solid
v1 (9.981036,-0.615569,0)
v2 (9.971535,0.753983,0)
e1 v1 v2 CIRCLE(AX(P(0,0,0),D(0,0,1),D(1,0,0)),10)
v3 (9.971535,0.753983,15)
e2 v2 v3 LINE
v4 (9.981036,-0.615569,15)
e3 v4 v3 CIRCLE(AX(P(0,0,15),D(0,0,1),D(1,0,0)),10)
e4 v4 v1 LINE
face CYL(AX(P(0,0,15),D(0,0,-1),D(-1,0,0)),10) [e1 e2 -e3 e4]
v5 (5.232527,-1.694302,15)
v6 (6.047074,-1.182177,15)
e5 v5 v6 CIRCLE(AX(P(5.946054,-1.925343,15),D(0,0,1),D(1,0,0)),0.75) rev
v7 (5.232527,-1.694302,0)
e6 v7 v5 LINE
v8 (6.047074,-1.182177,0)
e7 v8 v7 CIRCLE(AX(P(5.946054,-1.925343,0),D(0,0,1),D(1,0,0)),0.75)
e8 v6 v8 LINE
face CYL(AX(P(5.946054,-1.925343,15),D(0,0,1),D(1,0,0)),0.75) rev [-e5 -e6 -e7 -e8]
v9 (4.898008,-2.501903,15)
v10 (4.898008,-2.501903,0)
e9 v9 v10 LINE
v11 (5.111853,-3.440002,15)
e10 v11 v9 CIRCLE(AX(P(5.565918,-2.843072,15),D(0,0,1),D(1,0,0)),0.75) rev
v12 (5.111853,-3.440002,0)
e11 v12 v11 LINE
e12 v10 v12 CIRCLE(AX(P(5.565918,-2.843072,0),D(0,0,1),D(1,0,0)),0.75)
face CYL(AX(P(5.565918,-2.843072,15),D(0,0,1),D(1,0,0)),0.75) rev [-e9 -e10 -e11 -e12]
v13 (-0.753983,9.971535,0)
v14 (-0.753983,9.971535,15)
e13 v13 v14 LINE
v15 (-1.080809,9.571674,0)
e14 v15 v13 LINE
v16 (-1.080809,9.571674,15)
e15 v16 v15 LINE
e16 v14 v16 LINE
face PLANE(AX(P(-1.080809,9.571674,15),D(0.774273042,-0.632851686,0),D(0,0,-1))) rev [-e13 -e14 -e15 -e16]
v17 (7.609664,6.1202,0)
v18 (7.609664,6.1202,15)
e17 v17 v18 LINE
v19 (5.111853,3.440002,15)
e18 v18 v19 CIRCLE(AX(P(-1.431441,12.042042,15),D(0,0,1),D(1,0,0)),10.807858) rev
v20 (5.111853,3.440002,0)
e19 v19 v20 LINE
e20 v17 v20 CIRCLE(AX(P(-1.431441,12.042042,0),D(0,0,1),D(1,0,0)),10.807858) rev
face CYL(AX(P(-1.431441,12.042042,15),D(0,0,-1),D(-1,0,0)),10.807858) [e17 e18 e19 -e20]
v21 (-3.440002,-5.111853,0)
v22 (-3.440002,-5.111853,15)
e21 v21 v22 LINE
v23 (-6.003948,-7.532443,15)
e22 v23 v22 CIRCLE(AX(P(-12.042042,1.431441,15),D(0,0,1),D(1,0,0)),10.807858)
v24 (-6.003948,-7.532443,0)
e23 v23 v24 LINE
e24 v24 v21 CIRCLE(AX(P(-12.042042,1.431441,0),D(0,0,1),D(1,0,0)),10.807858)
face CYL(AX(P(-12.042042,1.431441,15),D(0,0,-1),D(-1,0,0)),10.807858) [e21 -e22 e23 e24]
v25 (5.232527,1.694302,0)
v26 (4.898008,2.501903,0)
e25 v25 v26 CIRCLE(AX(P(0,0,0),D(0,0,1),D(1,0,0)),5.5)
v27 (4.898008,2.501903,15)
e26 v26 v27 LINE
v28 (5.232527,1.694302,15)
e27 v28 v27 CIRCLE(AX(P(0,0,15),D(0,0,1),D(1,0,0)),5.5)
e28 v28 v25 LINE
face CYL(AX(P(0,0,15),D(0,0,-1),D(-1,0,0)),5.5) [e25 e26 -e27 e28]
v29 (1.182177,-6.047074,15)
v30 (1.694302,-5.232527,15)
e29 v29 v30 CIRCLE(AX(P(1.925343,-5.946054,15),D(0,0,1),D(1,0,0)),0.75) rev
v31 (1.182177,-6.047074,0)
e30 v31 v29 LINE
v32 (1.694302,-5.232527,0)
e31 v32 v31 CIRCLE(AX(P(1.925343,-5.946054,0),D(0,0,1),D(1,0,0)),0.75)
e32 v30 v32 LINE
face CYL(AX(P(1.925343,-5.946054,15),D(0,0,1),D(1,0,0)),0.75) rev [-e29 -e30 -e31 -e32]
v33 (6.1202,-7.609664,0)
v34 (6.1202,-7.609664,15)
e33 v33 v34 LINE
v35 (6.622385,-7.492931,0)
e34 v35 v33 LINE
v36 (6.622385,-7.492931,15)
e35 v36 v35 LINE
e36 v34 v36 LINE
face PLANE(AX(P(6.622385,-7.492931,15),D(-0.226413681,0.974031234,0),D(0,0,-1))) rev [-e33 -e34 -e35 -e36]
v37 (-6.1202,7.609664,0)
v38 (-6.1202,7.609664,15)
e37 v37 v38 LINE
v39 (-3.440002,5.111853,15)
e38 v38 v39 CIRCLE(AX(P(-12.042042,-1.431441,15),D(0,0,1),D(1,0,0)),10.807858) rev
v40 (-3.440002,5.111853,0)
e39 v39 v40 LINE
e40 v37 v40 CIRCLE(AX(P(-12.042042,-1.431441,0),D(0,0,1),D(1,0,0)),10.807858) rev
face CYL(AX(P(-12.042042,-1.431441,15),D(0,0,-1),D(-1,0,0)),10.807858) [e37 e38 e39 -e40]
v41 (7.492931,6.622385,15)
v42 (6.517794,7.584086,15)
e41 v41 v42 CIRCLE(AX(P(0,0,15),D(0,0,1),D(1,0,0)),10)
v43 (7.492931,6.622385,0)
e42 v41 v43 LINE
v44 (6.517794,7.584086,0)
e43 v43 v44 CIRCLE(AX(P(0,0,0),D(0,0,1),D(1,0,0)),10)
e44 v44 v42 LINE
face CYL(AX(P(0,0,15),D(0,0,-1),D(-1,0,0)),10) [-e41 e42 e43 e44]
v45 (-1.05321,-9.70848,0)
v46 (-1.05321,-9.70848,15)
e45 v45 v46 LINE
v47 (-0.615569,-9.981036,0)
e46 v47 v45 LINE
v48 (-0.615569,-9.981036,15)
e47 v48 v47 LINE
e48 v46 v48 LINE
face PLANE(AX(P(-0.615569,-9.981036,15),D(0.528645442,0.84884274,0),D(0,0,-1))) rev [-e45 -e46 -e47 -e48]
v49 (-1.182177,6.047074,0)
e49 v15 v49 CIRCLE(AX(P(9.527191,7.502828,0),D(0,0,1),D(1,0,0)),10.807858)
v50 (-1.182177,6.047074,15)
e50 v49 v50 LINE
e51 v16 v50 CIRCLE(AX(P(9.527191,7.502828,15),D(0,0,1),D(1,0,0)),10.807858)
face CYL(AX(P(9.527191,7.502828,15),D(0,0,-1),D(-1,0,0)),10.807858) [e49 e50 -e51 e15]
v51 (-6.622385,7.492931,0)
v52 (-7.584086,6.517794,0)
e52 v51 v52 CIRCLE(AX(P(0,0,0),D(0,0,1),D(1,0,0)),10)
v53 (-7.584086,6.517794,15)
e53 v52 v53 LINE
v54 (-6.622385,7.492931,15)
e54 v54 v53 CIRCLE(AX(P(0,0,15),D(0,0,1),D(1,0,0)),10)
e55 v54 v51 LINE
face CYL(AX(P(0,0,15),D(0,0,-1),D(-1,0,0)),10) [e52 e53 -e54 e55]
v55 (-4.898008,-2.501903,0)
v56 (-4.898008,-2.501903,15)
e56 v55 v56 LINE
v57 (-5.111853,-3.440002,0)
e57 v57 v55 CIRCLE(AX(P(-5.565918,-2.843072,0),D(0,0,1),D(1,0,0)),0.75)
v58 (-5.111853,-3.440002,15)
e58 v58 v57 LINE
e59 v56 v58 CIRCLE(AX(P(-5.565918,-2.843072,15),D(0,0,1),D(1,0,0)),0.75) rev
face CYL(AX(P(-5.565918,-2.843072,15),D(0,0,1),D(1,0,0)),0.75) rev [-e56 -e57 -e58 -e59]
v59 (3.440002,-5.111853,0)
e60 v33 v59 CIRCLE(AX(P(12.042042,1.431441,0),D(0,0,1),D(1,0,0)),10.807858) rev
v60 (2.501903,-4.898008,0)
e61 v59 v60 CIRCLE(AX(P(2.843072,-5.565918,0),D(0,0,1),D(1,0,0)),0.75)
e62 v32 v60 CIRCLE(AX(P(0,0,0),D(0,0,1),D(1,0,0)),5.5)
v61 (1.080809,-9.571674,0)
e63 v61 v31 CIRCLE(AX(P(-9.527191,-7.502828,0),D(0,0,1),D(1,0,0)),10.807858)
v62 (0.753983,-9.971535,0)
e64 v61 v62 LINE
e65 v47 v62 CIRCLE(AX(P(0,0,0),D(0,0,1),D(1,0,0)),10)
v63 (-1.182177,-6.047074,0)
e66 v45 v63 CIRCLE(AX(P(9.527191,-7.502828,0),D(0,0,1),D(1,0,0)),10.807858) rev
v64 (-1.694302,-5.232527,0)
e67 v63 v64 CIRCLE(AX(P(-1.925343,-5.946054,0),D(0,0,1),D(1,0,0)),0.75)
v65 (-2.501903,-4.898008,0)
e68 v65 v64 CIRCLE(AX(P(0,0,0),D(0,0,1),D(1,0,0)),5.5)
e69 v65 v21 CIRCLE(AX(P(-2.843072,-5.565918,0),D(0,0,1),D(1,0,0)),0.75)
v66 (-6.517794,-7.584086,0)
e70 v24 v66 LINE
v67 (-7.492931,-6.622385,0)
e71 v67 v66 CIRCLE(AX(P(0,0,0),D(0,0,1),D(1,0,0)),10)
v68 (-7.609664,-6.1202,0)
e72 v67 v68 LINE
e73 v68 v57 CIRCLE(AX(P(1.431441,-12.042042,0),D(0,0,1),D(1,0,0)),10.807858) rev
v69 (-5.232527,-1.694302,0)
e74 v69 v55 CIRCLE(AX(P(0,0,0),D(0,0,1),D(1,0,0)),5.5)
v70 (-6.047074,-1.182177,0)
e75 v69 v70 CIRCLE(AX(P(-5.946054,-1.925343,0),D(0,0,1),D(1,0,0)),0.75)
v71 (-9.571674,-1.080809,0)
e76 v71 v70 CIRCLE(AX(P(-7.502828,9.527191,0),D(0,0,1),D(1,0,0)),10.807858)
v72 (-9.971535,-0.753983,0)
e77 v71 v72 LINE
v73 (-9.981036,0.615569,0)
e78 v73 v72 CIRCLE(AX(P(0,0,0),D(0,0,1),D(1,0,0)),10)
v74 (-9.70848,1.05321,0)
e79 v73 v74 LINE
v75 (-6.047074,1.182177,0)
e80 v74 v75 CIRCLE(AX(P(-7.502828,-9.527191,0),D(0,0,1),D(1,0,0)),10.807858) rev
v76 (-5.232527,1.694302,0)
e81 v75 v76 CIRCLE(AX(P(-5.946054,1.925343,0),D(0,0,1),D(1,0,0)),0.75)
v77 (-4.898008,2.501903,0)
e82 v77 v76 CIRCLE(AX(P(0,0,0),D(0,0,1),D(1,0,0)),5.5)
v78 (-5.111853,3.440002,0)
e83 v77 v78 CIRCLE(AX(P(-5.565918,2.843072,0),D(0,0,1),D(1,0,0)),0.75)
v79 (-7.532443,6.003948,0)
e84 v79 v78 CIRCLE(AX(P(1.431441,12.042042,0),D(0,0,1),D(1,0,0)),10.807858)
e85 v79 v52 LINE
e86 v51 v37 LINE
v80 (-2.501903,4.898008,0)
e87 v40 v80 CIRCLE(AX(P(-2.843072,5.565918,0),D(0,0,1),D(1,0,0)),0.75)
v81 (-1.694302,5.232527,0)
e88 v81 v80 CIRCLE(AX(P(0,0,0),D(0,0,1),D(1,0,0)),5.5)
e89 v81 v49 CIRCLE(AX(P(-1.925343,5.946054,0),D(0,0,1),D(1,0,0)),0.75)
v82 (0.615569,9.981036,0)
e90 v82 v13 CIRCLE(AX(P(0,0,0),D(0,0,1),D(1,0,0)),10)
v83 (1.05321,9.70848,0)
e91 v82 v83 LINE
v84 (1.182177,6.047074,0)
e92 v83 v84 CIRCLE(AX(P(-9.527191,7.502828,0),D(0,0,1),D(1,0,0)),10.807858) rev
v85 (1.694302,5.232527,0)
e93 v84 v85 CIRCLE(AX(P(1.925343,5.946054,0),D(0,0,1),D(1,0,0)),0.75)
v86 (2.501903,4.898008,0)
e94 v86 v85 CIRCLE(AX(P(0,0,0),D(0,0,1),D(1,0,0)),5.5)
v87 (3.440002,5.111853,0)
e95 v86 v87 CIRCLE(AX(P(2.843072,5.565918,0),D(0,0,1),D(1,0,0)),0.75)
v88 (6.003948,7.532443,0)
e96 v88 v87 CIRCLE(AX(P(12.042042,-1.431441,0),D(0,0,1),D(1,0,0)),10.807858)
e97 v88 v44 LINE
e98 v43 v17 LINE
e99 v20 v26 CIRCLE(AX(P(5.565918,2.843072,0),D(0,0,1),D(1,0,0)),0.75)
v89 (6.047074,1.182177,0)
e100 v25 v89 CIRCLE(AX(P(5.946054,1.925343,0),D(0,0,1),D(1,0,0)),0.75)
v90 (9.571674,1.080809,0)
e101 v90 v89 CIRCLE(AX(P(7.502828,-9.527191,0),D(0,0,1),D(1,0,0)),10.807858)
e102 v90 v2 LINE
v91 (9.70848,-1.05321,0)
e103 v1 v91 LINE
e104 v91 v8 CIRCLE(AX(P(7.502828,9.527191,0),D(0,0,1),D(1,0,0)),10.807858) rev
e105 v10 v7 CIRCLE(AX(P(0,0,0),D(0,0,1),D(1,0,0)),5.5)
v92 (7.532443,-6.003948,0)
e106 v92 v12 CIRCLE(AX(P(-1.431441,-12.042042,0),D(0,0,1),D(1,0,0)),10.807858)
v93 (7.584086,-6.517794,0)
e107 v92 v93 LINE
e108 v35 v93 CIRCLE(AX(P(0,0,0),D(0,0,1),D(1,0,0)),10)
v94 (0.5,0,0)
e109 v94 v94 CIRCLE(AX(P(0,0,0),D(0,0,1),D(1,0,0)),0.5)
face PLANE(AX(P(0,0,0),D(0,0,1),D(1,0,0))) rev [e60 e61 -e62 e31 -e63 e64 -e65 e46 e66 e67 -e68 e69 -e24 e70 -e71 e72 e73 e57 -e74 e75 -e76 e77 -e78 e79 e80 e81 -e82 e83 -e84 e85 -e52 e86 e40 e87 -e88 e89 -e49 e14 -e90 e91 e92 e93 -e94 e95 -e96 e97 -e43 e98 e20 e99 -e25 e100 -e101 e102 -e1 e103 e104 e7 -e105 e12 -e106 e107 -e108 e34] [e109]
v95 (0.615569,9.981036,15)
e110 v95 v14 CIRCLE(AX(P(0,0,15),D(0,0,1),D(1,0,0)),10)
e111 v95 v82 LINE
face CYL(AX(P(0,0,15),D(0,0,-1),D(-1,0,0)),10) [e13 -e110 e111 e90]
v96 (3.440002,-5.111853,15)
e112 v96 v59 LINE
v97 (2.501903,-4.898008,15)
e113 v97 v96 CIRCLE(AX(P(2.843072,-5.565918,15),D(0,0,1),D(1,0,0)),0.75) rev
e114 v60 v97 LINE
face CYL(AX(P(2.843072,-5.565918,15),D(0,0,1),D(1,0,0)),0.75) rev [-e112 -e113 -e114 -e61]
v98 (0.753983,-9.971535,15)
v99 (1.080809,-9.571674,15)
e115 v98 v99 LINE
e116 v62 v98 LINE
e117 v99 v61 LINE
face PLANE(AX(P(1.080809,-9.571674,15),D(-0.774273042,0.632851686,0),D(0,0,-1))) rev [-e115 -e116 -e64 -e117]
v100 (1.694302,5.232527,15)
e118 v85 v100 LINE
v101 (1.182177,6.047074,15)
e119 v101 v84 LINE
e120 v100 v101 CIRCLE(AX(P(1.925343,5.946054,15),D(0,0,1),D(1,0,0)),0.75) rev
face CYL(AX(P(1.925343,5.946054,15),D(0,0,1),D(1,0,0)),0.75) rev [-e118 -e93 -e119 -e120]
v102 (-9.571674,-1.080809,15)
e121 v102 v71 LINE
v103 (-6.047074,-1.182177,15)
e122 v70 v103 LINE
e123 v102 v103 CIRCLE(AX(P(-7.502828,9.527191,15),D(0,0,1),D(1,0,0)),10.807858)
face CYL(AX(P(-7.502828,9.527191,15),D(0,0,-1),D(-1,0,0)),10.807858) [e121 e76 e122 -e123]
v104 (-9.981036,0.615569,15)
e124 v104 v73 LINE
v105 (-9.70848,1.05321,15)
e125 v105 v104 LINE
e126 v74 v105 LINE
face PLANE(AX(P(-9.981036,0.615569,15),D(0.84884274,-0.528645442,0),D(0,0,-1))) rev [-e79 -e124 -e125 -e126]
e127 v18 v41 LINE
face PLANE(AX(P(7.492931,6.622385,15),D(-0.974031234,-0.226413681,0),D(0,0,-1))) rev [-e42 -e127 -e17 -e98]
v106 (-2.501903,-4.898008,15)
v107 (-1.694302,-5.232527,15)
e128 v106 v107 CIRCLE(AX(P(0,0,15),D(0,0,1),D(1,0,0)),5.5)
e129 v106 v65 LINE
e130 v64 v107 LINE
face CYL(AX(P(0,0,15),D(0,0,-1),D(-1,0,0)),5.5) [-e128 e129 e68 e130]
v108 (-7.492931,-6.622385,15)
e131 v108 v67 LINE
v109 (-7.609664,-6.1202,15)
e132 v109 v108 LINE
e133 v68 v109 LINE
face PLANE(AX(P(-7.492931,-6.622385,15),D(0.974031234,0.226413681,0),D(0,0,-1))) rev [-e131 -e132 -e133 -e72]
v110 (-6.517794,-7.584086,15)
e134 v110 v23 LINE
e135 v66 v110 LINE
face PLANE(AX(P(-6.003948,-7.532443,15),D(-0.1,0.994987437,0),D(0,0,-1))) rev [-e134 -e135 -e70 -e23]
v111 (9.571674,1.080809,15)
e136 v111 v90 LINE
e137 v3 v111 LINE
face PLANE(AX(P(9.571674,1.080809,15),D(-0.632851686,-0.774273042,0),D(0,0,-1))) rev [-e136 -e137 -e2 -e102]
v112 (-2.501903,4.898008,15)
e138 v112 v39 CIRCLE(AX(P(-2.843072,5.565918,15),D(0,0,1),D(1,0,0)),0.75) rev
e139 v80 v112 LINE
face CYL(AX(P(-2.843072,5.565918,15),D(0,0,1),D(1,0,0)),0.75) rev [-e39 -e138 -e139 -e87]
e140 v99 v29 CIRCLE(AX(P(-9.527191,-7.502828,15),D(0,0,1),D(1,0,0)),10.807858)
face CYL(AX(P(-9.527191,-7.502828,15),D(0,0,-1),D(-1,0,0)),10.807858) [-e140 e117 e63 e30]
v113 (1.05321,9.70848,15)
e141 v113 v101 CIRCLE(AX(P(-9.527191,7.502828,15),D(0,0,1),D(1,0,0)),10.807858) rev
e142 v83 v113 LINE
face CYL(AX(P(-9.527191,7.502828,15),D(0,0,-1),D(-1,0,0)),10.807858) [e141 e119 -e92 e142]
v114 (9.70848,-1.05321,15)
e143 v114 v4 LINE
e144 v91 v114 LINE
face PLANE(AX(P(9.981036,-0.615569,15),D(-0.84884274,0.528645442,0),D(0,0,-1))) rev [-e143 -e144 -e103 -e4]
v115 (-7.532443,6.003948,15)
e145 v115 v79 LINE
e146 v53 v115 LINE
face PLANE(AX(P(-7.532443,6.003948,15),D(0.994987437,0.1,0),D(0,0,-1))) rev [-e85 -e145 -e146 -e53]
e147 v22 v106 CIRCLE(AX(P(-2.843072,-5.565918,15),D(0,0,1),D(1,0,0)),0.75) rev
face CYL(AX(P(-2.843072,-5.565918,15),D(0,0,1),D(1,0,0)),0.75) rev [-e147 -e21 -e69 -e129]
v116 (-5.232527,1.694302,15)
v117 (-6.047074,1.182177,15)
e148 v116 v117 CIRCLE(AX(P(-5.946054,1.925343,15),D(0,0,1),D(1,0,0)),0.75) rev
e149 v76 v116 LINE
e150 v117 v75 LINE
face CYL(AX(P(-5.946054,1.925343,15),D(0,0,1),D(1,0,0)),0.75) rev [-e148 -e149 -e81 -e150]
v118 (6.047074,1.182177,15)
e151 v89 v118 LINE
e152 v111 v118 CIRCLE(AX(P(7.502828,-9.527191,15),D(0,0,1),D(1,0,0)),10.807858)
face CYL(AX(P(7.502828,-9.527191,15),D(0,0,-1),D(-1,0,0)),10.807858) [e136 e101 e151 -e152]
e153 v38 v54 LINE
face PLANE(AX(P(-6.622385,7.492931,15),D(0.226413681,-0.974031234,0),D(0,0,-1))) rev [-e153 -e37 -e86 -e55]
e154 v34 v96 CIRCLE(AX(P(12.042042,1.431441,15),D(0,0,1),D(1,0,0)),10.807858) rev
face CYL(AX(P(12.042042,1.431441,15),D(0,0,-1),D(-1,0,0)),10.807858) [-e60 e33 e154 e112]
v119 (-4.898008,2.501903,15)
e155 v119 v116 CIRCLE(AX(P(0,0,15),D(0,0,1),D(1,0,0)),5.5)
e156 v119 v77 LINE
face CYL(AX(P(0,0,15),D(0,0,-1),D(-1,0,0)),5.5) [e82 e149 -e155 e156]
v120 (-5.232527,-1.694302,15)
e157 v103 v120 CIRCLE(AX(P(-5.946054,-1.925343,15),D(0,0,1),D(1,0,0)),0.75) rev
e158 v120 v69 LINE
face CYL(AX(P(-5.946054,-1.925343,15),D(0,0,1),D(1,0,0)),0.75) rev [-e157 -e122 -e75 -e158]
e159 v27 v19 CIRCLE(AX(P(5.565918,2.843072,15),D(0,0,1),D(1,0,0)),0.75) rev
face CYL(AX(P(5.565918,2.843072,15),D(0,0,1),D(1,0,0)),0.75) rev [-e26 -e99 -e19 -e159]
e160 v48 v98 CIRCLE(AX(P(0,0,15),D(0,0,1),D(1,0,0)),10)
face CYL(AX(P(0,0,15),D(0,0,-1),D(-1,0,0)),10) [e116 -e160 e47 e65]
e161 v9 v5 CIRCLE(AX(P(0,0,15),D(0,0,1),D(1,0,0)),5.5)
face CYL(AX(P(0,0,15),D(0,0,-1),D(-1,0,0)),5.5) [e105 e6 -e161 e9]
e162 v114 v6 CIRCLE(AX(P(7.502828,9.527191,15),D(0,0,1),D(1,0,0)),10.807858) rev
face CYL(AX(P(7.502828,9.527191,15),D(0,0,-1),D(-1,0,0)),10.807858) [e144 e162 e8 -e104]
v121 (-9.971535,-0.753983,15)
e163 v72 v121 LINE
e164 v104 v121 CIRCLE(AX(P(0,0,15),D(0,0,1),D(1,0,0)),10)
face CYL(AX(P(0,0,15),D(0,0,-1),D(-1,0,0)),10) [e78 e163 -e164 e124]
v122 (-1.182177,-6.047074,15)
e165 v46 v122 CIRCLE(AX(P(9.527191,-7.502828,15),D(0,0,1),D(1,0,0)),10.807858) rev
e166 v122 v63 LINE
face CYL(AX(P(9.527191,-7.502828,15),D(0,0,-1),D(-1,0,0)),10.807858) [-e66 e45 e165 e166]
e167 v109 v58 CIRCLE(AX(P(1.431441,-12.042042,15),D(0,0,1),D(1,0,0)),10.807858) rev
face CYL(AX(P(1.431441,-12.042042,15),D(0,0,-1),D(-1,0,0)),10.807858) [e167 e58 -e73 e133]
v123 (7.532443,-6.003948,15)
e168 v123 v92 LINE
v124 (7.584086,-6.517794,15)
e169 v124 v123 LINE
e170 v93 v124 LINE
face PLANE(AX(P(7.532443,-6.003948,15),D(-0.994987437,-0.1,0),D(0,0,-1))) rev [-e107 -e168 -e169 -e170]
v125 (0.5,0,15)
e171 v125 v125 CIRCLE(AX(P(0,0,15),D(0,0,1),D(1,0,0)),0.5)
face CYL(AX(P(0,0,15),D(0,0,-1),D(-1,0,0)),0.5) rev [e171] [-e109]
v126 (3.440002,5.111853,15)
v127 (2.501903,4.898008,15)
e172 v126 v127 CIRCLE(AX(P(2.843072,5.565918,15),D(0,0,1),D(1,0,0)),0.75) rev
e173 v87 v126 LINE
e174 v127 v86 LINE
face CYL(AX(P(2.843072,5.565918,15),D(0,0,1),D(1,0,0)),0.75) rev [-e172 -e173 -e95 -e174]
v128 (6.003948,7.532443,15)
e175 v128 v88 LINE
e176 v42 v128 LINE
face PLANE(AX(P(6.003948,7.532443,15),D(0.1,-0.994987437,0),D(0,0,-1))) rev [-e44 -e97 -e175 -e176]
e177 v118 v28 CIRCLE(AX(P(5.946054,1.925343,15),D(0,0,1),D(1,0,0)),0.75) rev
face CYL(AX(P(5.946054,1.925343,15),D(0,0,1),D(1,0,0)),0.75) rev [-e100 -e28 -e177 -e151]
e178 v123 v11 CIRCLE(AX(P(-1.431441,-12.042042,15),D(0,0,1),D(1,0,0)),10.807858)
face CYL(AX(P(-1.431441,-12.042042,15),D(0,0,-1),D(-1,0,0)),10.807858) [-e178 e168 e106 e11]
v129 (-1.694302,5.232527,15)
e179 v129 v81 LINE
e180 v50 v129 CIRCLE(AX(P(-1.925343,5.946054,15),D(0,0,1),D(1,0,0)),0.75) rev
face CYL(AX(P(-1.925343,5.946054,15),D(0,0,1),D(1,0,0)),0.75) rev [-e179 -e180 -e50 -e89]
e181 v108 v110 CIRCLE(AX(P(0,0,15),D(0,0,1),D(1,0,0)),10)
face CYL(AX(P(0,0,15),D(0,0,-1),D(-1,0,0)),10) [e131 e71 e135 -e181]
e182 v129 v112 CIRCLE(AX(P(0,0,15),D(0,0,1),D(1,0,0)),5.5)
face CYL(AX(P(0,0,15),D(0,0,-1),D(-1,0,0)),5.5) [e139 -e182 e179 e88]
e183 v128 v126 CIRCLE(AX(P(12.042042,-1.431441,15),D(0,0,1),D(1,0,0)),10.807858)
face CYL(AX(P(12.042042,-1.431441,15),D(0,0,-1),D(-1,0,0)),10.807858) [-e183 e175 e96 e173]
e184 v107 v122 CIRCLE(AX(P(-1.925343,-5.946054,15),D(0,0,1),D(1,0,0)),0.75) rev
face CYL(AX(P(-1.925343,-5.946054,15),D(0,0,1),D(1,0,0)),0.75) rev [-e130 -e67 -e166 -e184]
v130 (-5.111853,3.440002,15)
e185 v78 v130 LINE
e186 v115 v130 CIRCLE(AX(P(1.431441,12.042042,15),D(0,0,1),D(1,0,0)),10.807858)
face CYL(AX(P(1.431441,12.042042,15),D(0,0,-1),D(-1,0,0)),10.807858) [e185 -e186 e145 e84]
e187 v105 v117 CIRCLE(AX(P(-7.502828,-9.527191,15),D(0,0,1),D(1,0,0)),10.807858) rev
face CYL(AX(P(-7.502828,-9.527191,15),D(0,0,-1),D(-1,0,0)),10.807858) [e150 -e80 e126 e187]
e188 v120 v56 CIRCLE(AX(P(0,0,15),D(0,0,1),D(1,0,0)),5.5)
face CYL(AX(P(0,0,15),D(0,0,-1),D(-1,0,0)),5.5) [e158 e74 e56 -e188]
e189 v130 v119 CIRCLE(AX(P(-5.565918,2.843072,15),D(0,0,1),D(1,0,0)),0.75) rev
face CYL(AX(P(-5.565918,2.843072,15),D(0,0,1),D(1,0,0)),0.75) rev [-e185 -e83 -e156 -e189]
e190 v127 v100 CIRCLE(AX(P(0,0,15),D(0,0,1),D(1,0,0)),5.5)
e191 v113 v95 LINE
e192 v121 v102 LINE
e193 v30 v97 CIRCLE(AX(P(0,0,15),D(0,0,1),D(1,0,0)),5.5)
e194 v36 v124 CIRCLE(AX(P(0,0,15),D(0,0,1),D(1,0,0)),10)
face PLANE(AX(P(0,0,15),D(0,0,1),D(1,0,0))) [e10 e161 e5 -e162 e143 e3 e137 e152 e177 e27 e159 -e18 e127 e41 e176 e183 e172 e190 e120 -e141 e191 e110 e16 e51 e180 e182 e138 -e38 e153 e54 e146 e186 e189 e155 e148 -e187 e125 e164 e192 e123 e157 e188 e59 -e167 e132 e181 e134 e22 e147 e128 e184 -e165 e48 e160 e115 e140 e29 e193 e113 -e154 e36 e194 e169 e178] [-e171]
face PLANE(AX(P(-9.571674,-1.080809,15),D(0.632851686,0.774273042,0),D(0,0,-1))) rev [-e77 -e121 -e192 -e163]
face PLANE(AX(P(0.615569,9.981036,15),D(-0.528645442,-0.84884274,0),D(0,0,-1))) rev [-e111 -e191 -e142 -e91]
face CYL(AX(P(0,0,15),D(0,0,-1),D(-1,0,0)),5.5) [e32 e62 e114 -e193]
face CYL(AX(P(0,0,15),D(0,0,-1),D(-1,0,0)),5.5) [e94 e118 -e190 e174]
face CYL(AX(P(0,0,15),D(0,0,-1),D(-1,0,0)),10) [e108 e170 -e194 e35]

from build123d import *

# Parameters (mm, degrees)
SKETCH1_R           = 0.5
BOSS_EXTRUDE1_DEPTH = 15
FILLET1_R           = 0.75


with BuildPart() as part:
    # Sketch1 → Boss-Extrude1 (new body)
    with BuildSketch(Plane.XY):
        with BuildLine():
            ThreePointArc((9.949874371, -1), (10, 0), (9.949874371, 1))
            ThreePointArc((9.949874371, 1), (7.675986954, 1.279279491), (5.394319042, 1.072996771))
            ThreePointArc((5.394319042, 1.072996771), (5.081337429, 2.104758878), (4.573082868, 3.055636282))
            ThreePointArc((4.573082868, 3.055636282), (6.332329631, 4.523155224), (7.742730421, 6.328516859))
            ThreePointArc((7.742730421, 6.328516859), (7.071067812, 7.071067812), (6.328516859, 7.742730421))
            ThreePointArc((6.328516859, 7.742730421), (4.523155224, 6.332329631), (3.055636282, 4.573082868))
            ThreePointArc((3.055636282, 4.573082868), (2.104758878, 5.081337429), (1.072996771, 5.394319042))
            ThreePointArc((1.072996771, 5.394319042), (1.279279491, 7.675986954), (1, 9.949874371))
            ThreePointArc((1, 9.949874371), (0, 10), (-1, 9.949874371))
            ThreePointArc((-1, 9.949874371), (-1.279279491, 7.675986954), (-1.072996771, 5.394319042))
            ThreePointArc((-1.072996771, 5.394319042), (-2.104758878, 5.081337429), (-3.055636282, 4.573082868))
            ThreePointArc((-3.055636282, 4.573082868), (-4.523155224, 6.332329631), (-6.328516859, 7.742730421))
            ThreePointArc((-6.328516859, 7.742730421), (-7.071067812, 7.071067812), (-7.742730421, 6.328516859))
            ThreePointArc((-7.742730421, 6.328516859), (-6.332329631, 4.523155224), (-4.573082868, 3.055636282))
            ThreePointArc((-4.573082868, 3.055636282), (-5.081337429, 2.104758878), (-5.394319042, 1.072996771))
            ThreePointArc((-5.394319042, 1.072996771), (-7.675986954, 1.279279491), (-9.949874371, 1))
            ThreePointArc((-9.949874371, 1), (-10, 0), (-9.949874371, -1))
            ThreePointArc((-9.949874371, -1), (-7.675986954, -1.279279491), (-5.394319042, -1.072996771))
            ThreePointArc((-5.394319042, -1.072996771), (-5.081337429, -2.104758878), (-4.573082868, -3.055636282))
            ThreePointArc((-4.573082868, -3.055636282), (-6.332329631, -4.523155224), (-7.742730421, -6.328516859))
            ThreePointArc((-7.742730421, -6.328516859), (-7.071067812, -7.071067812), (-6.328516859, -7.742730421))
            ThreePointArc((-6.328516859, -7.742730421), (-4.523155224, -6.332329631), (-3.055636282, -4.573082868))
            ThreePointArc((-3.055636282, -4.573082868), (-2.104758878, -5.081337429), (-1.072996771, -5.394319042))
            ThreePointArc((-1.072996771, -5.394319042), (-1.279279491, -7.675986954), (-1, -9.949874371))
            ThreePointArc((-1, -9.949874371), (0, -10), (1, -9.949874371))
            ThreePointArc((1, -9.949874371), (1.279279491, -7.675986954), (1.072996771, -5.394319042))
            ThreePointArc((1.072996771, -5.394319042), (2.104758878, -5.081337429), (3.055636282, -4.573082868))
            ThreePointArc((3.055636282, -4.573082868), (4.523155224, -6.332329631), (6.328516859, -7.742730421))
            ThreePointArc((6.328516859, -7.742730421), (7.071067812, -7.071067812), (7.742730421, -6.328516859))
            ThreePointArc((7.742730421, -6.328516859), (6.332329631, -4.523155224), (4.573082868, -3.055636282))
            ThreePointArc((4.573082868, -3.055636282), (5.081337429, -2.104758878), (5.394319042, -1.072996771))
            ThreePointArc((5.394319042, -1.072996771), (7.675986954, -1.279279491), (9.949874371, -1))
        make_face()
        Circle(SKETCH1_R, mode=Mode.SUBTRACT)
    extrude(amount=BOSS_EXTRUDE1_DEPTH)

    # Fillet1
    fillet1_edges = [part.edges().sort_by_distance(p)[0] for p in [
        (-3.055636282, 4.573082868, 7.5),
        (-1.072996771, 5.394319042, 7.5),
        (1.072996771, 5.394319042, 7.5),
        (3.055636282, 4.573082868, 7.5),
        (4.573082868, 3.055636282, 7.5),
        (5.394319042, 1.072996771, 7.5),
        (5.394319042, -1.072996771, 7.5),
        (4.573082868, -3.055636282, 7.5),
        (3.055636282, -4.573082868, 7.5),
        (1.072996771, -5.394319042, 7.5),
        (-1.072996771, -5.394319042, 7.5),
        (-3.055636282, -4.573082868, 7.5),
        (-4.573082868, -3.055636282, 7.5),
        (-5.394319042, -1.072996771, 7.5),
        (-5.394319042, 1.072996771, 7.5),
        (-4.573082868, 3.055636282, 7.5),
    ]]
    fillet(fillet1_edges, radius=FILLET1_R)

    # Chamfer1
    # the kernel refuses this chamfer: 0.400753043, 0.25 mm, written as the material it takes off along each edge
    with BuildSketch(Plane(origin=(-1, 9.949874371, -1.002654566), x_dir=(-0.20895056645283513, -0.9779262041580844, 0), z_dir=(0, 0, 1)), Plane(origin=(-6.328516859, -7.742730421, -1.002654566), x_dir=(0.8392486129317811, 0.543747887988617, 0), z_dir=(0, 0, 1)), Plane(origin=(-9.949874371, -1, -1.002654566), x_dir=(0.9779262041580814, -0.20895056645284896, 0), z_dir=(0, 0, 1)), Plane(origin=(-7.742730421, 6.328516859, -1.002654566), x_dir=(0.5437478879886213, -0.8392486129317783, 0), z_dir=(0, 0, 1))) as chamfer1_piece_1:
        with BuildLine():
            Line((0.38673743, 0), (-0.072587978, 0.236060888))
            ThreePointArc((-0.072587978, 0.236060888), (-0.038665519, 0.123154019), (0, 0))
            ThreePointArc((0, 0), (0.200496166, -0.001727616), (0.38673743, 0))
        make_face()
    extrude(amount=17.005309131, mode=Mode.SUBTRACT)
    with BuildSketch(Plane(origin=(1, 9.949874371, -1.000017097), x_dir=(-0.9967308645828112, 0.08079346253256948, 0), z_dir=(0, 0, 1)), Plane(origin=(-7.742730421, -6.328516859, -1.000017097), x_dir=(0.6476655481321507, -0.761924758596727, 0), z_dir=(0, 0, 1)), Plane(origin=(-9.949874371, 1, -1.000017097), x_dir=(-0.0807934625325496, -0.9967308645828128, 0), z_dir=(0, 0, 1)), Plane(origin=(-6.328516859, 7.742730421, -1.000017097), x_dir=(-0.7619247585967629, -0.6476655481321085, 0), z_dir=(0, 0, 1))) as chamfer1_piece_2:
        with BuildLine():
            Line((0.385692125, 0), (-0.072539186, 0.236306293))
            ThreePointArc((-0.072539186, 0.236306293), (-0.038587076, 0.123299359), (0, 0))
            ThreePointArc((0, 0), (0.199968385, -0.001857117), (0.385692125, 0))
        make_face()
    extrude(amount=17.000034195, mode=Mode.SUBTRACT)
    with BuildSketch(Plane(origin=(6.328516859, 7.742730421, -1.002654566), x_dir=(0.7663992656604338, -0.6423645114692652, 0), z_dir=(0, 0, 1)), Plane(origin=(9.949874371, 1, -1.002654566), x_dir=(0.08770581579133363, -0.9961464198983886, 0), z_dir=(0, 0, 1)), Plane(origin=(7.742730421, -6.328516859, -1.002654566), x_dir=(-0.6423645114693267, -0.7663992656603822, 0), z_dir=(0, 0, 1)), Plane(origin=(1, -9.949874371, -1.002654566), x_dir=(-0.9961464198983921, -0.08770581579129355, 0), z_dir=(0, 0, 1))) as chamfer1_piece_3:
        with BuildLine():
            Line((0.246969142, 0), (-0.113667999, -0.36965582))
            ThreePointArc((-0.113667999, -0.36965582), (-0.060580175, -0.19113278), (0, 0))
            ThreePointArc((0, 0), (0.129078874, 0.000760886), (0.246969142, 0))
        make_face()
    extrude(amount=17.005309131, mode=Mode.SUBTRACT)
    with BuildSketch(Plane(origin=(7.742730421, 6.328516859, -1.000017097), x_dir=(-0.538317928460667, -0.8427418394133617, 0), z_dir=(0, 0, 1)), Plane(origin=(9.949874371, -1, -1.000017097), x_dir=(-0.9765567270876431, -0.215260211789988, 0), z_dir=(0, 0, 1)), Plane(origin=(6.328516859, -7.742730421, -1.000017097), x_dir=(-0.8427418394133621, 0.5383179284606663, 0), z_dir=(0, 0, 1)), Plane(origin=(-1, -9.949874371, -1.000017097), x_dir=(-0.21526021179000385, 0.9765567270876397, 0), z_dir=(0, 0, 1))) as chamfer1_piece_4:
        with BuildLine():
            Line((0.247189396, 0), (-0.113183628, -0.368711108))
            ThreePointArc((-0.113183628, -0.368711108), (-0.060457254, -0.190619318), (0, 0))
            ThreePointArc((0, 0), (0.129194415, 0.000705264), (0.247189396, 0))
        make_face()
    extrude(amount=17.000034195, mode=Mode.SUBTRACT)


solid = part.part
